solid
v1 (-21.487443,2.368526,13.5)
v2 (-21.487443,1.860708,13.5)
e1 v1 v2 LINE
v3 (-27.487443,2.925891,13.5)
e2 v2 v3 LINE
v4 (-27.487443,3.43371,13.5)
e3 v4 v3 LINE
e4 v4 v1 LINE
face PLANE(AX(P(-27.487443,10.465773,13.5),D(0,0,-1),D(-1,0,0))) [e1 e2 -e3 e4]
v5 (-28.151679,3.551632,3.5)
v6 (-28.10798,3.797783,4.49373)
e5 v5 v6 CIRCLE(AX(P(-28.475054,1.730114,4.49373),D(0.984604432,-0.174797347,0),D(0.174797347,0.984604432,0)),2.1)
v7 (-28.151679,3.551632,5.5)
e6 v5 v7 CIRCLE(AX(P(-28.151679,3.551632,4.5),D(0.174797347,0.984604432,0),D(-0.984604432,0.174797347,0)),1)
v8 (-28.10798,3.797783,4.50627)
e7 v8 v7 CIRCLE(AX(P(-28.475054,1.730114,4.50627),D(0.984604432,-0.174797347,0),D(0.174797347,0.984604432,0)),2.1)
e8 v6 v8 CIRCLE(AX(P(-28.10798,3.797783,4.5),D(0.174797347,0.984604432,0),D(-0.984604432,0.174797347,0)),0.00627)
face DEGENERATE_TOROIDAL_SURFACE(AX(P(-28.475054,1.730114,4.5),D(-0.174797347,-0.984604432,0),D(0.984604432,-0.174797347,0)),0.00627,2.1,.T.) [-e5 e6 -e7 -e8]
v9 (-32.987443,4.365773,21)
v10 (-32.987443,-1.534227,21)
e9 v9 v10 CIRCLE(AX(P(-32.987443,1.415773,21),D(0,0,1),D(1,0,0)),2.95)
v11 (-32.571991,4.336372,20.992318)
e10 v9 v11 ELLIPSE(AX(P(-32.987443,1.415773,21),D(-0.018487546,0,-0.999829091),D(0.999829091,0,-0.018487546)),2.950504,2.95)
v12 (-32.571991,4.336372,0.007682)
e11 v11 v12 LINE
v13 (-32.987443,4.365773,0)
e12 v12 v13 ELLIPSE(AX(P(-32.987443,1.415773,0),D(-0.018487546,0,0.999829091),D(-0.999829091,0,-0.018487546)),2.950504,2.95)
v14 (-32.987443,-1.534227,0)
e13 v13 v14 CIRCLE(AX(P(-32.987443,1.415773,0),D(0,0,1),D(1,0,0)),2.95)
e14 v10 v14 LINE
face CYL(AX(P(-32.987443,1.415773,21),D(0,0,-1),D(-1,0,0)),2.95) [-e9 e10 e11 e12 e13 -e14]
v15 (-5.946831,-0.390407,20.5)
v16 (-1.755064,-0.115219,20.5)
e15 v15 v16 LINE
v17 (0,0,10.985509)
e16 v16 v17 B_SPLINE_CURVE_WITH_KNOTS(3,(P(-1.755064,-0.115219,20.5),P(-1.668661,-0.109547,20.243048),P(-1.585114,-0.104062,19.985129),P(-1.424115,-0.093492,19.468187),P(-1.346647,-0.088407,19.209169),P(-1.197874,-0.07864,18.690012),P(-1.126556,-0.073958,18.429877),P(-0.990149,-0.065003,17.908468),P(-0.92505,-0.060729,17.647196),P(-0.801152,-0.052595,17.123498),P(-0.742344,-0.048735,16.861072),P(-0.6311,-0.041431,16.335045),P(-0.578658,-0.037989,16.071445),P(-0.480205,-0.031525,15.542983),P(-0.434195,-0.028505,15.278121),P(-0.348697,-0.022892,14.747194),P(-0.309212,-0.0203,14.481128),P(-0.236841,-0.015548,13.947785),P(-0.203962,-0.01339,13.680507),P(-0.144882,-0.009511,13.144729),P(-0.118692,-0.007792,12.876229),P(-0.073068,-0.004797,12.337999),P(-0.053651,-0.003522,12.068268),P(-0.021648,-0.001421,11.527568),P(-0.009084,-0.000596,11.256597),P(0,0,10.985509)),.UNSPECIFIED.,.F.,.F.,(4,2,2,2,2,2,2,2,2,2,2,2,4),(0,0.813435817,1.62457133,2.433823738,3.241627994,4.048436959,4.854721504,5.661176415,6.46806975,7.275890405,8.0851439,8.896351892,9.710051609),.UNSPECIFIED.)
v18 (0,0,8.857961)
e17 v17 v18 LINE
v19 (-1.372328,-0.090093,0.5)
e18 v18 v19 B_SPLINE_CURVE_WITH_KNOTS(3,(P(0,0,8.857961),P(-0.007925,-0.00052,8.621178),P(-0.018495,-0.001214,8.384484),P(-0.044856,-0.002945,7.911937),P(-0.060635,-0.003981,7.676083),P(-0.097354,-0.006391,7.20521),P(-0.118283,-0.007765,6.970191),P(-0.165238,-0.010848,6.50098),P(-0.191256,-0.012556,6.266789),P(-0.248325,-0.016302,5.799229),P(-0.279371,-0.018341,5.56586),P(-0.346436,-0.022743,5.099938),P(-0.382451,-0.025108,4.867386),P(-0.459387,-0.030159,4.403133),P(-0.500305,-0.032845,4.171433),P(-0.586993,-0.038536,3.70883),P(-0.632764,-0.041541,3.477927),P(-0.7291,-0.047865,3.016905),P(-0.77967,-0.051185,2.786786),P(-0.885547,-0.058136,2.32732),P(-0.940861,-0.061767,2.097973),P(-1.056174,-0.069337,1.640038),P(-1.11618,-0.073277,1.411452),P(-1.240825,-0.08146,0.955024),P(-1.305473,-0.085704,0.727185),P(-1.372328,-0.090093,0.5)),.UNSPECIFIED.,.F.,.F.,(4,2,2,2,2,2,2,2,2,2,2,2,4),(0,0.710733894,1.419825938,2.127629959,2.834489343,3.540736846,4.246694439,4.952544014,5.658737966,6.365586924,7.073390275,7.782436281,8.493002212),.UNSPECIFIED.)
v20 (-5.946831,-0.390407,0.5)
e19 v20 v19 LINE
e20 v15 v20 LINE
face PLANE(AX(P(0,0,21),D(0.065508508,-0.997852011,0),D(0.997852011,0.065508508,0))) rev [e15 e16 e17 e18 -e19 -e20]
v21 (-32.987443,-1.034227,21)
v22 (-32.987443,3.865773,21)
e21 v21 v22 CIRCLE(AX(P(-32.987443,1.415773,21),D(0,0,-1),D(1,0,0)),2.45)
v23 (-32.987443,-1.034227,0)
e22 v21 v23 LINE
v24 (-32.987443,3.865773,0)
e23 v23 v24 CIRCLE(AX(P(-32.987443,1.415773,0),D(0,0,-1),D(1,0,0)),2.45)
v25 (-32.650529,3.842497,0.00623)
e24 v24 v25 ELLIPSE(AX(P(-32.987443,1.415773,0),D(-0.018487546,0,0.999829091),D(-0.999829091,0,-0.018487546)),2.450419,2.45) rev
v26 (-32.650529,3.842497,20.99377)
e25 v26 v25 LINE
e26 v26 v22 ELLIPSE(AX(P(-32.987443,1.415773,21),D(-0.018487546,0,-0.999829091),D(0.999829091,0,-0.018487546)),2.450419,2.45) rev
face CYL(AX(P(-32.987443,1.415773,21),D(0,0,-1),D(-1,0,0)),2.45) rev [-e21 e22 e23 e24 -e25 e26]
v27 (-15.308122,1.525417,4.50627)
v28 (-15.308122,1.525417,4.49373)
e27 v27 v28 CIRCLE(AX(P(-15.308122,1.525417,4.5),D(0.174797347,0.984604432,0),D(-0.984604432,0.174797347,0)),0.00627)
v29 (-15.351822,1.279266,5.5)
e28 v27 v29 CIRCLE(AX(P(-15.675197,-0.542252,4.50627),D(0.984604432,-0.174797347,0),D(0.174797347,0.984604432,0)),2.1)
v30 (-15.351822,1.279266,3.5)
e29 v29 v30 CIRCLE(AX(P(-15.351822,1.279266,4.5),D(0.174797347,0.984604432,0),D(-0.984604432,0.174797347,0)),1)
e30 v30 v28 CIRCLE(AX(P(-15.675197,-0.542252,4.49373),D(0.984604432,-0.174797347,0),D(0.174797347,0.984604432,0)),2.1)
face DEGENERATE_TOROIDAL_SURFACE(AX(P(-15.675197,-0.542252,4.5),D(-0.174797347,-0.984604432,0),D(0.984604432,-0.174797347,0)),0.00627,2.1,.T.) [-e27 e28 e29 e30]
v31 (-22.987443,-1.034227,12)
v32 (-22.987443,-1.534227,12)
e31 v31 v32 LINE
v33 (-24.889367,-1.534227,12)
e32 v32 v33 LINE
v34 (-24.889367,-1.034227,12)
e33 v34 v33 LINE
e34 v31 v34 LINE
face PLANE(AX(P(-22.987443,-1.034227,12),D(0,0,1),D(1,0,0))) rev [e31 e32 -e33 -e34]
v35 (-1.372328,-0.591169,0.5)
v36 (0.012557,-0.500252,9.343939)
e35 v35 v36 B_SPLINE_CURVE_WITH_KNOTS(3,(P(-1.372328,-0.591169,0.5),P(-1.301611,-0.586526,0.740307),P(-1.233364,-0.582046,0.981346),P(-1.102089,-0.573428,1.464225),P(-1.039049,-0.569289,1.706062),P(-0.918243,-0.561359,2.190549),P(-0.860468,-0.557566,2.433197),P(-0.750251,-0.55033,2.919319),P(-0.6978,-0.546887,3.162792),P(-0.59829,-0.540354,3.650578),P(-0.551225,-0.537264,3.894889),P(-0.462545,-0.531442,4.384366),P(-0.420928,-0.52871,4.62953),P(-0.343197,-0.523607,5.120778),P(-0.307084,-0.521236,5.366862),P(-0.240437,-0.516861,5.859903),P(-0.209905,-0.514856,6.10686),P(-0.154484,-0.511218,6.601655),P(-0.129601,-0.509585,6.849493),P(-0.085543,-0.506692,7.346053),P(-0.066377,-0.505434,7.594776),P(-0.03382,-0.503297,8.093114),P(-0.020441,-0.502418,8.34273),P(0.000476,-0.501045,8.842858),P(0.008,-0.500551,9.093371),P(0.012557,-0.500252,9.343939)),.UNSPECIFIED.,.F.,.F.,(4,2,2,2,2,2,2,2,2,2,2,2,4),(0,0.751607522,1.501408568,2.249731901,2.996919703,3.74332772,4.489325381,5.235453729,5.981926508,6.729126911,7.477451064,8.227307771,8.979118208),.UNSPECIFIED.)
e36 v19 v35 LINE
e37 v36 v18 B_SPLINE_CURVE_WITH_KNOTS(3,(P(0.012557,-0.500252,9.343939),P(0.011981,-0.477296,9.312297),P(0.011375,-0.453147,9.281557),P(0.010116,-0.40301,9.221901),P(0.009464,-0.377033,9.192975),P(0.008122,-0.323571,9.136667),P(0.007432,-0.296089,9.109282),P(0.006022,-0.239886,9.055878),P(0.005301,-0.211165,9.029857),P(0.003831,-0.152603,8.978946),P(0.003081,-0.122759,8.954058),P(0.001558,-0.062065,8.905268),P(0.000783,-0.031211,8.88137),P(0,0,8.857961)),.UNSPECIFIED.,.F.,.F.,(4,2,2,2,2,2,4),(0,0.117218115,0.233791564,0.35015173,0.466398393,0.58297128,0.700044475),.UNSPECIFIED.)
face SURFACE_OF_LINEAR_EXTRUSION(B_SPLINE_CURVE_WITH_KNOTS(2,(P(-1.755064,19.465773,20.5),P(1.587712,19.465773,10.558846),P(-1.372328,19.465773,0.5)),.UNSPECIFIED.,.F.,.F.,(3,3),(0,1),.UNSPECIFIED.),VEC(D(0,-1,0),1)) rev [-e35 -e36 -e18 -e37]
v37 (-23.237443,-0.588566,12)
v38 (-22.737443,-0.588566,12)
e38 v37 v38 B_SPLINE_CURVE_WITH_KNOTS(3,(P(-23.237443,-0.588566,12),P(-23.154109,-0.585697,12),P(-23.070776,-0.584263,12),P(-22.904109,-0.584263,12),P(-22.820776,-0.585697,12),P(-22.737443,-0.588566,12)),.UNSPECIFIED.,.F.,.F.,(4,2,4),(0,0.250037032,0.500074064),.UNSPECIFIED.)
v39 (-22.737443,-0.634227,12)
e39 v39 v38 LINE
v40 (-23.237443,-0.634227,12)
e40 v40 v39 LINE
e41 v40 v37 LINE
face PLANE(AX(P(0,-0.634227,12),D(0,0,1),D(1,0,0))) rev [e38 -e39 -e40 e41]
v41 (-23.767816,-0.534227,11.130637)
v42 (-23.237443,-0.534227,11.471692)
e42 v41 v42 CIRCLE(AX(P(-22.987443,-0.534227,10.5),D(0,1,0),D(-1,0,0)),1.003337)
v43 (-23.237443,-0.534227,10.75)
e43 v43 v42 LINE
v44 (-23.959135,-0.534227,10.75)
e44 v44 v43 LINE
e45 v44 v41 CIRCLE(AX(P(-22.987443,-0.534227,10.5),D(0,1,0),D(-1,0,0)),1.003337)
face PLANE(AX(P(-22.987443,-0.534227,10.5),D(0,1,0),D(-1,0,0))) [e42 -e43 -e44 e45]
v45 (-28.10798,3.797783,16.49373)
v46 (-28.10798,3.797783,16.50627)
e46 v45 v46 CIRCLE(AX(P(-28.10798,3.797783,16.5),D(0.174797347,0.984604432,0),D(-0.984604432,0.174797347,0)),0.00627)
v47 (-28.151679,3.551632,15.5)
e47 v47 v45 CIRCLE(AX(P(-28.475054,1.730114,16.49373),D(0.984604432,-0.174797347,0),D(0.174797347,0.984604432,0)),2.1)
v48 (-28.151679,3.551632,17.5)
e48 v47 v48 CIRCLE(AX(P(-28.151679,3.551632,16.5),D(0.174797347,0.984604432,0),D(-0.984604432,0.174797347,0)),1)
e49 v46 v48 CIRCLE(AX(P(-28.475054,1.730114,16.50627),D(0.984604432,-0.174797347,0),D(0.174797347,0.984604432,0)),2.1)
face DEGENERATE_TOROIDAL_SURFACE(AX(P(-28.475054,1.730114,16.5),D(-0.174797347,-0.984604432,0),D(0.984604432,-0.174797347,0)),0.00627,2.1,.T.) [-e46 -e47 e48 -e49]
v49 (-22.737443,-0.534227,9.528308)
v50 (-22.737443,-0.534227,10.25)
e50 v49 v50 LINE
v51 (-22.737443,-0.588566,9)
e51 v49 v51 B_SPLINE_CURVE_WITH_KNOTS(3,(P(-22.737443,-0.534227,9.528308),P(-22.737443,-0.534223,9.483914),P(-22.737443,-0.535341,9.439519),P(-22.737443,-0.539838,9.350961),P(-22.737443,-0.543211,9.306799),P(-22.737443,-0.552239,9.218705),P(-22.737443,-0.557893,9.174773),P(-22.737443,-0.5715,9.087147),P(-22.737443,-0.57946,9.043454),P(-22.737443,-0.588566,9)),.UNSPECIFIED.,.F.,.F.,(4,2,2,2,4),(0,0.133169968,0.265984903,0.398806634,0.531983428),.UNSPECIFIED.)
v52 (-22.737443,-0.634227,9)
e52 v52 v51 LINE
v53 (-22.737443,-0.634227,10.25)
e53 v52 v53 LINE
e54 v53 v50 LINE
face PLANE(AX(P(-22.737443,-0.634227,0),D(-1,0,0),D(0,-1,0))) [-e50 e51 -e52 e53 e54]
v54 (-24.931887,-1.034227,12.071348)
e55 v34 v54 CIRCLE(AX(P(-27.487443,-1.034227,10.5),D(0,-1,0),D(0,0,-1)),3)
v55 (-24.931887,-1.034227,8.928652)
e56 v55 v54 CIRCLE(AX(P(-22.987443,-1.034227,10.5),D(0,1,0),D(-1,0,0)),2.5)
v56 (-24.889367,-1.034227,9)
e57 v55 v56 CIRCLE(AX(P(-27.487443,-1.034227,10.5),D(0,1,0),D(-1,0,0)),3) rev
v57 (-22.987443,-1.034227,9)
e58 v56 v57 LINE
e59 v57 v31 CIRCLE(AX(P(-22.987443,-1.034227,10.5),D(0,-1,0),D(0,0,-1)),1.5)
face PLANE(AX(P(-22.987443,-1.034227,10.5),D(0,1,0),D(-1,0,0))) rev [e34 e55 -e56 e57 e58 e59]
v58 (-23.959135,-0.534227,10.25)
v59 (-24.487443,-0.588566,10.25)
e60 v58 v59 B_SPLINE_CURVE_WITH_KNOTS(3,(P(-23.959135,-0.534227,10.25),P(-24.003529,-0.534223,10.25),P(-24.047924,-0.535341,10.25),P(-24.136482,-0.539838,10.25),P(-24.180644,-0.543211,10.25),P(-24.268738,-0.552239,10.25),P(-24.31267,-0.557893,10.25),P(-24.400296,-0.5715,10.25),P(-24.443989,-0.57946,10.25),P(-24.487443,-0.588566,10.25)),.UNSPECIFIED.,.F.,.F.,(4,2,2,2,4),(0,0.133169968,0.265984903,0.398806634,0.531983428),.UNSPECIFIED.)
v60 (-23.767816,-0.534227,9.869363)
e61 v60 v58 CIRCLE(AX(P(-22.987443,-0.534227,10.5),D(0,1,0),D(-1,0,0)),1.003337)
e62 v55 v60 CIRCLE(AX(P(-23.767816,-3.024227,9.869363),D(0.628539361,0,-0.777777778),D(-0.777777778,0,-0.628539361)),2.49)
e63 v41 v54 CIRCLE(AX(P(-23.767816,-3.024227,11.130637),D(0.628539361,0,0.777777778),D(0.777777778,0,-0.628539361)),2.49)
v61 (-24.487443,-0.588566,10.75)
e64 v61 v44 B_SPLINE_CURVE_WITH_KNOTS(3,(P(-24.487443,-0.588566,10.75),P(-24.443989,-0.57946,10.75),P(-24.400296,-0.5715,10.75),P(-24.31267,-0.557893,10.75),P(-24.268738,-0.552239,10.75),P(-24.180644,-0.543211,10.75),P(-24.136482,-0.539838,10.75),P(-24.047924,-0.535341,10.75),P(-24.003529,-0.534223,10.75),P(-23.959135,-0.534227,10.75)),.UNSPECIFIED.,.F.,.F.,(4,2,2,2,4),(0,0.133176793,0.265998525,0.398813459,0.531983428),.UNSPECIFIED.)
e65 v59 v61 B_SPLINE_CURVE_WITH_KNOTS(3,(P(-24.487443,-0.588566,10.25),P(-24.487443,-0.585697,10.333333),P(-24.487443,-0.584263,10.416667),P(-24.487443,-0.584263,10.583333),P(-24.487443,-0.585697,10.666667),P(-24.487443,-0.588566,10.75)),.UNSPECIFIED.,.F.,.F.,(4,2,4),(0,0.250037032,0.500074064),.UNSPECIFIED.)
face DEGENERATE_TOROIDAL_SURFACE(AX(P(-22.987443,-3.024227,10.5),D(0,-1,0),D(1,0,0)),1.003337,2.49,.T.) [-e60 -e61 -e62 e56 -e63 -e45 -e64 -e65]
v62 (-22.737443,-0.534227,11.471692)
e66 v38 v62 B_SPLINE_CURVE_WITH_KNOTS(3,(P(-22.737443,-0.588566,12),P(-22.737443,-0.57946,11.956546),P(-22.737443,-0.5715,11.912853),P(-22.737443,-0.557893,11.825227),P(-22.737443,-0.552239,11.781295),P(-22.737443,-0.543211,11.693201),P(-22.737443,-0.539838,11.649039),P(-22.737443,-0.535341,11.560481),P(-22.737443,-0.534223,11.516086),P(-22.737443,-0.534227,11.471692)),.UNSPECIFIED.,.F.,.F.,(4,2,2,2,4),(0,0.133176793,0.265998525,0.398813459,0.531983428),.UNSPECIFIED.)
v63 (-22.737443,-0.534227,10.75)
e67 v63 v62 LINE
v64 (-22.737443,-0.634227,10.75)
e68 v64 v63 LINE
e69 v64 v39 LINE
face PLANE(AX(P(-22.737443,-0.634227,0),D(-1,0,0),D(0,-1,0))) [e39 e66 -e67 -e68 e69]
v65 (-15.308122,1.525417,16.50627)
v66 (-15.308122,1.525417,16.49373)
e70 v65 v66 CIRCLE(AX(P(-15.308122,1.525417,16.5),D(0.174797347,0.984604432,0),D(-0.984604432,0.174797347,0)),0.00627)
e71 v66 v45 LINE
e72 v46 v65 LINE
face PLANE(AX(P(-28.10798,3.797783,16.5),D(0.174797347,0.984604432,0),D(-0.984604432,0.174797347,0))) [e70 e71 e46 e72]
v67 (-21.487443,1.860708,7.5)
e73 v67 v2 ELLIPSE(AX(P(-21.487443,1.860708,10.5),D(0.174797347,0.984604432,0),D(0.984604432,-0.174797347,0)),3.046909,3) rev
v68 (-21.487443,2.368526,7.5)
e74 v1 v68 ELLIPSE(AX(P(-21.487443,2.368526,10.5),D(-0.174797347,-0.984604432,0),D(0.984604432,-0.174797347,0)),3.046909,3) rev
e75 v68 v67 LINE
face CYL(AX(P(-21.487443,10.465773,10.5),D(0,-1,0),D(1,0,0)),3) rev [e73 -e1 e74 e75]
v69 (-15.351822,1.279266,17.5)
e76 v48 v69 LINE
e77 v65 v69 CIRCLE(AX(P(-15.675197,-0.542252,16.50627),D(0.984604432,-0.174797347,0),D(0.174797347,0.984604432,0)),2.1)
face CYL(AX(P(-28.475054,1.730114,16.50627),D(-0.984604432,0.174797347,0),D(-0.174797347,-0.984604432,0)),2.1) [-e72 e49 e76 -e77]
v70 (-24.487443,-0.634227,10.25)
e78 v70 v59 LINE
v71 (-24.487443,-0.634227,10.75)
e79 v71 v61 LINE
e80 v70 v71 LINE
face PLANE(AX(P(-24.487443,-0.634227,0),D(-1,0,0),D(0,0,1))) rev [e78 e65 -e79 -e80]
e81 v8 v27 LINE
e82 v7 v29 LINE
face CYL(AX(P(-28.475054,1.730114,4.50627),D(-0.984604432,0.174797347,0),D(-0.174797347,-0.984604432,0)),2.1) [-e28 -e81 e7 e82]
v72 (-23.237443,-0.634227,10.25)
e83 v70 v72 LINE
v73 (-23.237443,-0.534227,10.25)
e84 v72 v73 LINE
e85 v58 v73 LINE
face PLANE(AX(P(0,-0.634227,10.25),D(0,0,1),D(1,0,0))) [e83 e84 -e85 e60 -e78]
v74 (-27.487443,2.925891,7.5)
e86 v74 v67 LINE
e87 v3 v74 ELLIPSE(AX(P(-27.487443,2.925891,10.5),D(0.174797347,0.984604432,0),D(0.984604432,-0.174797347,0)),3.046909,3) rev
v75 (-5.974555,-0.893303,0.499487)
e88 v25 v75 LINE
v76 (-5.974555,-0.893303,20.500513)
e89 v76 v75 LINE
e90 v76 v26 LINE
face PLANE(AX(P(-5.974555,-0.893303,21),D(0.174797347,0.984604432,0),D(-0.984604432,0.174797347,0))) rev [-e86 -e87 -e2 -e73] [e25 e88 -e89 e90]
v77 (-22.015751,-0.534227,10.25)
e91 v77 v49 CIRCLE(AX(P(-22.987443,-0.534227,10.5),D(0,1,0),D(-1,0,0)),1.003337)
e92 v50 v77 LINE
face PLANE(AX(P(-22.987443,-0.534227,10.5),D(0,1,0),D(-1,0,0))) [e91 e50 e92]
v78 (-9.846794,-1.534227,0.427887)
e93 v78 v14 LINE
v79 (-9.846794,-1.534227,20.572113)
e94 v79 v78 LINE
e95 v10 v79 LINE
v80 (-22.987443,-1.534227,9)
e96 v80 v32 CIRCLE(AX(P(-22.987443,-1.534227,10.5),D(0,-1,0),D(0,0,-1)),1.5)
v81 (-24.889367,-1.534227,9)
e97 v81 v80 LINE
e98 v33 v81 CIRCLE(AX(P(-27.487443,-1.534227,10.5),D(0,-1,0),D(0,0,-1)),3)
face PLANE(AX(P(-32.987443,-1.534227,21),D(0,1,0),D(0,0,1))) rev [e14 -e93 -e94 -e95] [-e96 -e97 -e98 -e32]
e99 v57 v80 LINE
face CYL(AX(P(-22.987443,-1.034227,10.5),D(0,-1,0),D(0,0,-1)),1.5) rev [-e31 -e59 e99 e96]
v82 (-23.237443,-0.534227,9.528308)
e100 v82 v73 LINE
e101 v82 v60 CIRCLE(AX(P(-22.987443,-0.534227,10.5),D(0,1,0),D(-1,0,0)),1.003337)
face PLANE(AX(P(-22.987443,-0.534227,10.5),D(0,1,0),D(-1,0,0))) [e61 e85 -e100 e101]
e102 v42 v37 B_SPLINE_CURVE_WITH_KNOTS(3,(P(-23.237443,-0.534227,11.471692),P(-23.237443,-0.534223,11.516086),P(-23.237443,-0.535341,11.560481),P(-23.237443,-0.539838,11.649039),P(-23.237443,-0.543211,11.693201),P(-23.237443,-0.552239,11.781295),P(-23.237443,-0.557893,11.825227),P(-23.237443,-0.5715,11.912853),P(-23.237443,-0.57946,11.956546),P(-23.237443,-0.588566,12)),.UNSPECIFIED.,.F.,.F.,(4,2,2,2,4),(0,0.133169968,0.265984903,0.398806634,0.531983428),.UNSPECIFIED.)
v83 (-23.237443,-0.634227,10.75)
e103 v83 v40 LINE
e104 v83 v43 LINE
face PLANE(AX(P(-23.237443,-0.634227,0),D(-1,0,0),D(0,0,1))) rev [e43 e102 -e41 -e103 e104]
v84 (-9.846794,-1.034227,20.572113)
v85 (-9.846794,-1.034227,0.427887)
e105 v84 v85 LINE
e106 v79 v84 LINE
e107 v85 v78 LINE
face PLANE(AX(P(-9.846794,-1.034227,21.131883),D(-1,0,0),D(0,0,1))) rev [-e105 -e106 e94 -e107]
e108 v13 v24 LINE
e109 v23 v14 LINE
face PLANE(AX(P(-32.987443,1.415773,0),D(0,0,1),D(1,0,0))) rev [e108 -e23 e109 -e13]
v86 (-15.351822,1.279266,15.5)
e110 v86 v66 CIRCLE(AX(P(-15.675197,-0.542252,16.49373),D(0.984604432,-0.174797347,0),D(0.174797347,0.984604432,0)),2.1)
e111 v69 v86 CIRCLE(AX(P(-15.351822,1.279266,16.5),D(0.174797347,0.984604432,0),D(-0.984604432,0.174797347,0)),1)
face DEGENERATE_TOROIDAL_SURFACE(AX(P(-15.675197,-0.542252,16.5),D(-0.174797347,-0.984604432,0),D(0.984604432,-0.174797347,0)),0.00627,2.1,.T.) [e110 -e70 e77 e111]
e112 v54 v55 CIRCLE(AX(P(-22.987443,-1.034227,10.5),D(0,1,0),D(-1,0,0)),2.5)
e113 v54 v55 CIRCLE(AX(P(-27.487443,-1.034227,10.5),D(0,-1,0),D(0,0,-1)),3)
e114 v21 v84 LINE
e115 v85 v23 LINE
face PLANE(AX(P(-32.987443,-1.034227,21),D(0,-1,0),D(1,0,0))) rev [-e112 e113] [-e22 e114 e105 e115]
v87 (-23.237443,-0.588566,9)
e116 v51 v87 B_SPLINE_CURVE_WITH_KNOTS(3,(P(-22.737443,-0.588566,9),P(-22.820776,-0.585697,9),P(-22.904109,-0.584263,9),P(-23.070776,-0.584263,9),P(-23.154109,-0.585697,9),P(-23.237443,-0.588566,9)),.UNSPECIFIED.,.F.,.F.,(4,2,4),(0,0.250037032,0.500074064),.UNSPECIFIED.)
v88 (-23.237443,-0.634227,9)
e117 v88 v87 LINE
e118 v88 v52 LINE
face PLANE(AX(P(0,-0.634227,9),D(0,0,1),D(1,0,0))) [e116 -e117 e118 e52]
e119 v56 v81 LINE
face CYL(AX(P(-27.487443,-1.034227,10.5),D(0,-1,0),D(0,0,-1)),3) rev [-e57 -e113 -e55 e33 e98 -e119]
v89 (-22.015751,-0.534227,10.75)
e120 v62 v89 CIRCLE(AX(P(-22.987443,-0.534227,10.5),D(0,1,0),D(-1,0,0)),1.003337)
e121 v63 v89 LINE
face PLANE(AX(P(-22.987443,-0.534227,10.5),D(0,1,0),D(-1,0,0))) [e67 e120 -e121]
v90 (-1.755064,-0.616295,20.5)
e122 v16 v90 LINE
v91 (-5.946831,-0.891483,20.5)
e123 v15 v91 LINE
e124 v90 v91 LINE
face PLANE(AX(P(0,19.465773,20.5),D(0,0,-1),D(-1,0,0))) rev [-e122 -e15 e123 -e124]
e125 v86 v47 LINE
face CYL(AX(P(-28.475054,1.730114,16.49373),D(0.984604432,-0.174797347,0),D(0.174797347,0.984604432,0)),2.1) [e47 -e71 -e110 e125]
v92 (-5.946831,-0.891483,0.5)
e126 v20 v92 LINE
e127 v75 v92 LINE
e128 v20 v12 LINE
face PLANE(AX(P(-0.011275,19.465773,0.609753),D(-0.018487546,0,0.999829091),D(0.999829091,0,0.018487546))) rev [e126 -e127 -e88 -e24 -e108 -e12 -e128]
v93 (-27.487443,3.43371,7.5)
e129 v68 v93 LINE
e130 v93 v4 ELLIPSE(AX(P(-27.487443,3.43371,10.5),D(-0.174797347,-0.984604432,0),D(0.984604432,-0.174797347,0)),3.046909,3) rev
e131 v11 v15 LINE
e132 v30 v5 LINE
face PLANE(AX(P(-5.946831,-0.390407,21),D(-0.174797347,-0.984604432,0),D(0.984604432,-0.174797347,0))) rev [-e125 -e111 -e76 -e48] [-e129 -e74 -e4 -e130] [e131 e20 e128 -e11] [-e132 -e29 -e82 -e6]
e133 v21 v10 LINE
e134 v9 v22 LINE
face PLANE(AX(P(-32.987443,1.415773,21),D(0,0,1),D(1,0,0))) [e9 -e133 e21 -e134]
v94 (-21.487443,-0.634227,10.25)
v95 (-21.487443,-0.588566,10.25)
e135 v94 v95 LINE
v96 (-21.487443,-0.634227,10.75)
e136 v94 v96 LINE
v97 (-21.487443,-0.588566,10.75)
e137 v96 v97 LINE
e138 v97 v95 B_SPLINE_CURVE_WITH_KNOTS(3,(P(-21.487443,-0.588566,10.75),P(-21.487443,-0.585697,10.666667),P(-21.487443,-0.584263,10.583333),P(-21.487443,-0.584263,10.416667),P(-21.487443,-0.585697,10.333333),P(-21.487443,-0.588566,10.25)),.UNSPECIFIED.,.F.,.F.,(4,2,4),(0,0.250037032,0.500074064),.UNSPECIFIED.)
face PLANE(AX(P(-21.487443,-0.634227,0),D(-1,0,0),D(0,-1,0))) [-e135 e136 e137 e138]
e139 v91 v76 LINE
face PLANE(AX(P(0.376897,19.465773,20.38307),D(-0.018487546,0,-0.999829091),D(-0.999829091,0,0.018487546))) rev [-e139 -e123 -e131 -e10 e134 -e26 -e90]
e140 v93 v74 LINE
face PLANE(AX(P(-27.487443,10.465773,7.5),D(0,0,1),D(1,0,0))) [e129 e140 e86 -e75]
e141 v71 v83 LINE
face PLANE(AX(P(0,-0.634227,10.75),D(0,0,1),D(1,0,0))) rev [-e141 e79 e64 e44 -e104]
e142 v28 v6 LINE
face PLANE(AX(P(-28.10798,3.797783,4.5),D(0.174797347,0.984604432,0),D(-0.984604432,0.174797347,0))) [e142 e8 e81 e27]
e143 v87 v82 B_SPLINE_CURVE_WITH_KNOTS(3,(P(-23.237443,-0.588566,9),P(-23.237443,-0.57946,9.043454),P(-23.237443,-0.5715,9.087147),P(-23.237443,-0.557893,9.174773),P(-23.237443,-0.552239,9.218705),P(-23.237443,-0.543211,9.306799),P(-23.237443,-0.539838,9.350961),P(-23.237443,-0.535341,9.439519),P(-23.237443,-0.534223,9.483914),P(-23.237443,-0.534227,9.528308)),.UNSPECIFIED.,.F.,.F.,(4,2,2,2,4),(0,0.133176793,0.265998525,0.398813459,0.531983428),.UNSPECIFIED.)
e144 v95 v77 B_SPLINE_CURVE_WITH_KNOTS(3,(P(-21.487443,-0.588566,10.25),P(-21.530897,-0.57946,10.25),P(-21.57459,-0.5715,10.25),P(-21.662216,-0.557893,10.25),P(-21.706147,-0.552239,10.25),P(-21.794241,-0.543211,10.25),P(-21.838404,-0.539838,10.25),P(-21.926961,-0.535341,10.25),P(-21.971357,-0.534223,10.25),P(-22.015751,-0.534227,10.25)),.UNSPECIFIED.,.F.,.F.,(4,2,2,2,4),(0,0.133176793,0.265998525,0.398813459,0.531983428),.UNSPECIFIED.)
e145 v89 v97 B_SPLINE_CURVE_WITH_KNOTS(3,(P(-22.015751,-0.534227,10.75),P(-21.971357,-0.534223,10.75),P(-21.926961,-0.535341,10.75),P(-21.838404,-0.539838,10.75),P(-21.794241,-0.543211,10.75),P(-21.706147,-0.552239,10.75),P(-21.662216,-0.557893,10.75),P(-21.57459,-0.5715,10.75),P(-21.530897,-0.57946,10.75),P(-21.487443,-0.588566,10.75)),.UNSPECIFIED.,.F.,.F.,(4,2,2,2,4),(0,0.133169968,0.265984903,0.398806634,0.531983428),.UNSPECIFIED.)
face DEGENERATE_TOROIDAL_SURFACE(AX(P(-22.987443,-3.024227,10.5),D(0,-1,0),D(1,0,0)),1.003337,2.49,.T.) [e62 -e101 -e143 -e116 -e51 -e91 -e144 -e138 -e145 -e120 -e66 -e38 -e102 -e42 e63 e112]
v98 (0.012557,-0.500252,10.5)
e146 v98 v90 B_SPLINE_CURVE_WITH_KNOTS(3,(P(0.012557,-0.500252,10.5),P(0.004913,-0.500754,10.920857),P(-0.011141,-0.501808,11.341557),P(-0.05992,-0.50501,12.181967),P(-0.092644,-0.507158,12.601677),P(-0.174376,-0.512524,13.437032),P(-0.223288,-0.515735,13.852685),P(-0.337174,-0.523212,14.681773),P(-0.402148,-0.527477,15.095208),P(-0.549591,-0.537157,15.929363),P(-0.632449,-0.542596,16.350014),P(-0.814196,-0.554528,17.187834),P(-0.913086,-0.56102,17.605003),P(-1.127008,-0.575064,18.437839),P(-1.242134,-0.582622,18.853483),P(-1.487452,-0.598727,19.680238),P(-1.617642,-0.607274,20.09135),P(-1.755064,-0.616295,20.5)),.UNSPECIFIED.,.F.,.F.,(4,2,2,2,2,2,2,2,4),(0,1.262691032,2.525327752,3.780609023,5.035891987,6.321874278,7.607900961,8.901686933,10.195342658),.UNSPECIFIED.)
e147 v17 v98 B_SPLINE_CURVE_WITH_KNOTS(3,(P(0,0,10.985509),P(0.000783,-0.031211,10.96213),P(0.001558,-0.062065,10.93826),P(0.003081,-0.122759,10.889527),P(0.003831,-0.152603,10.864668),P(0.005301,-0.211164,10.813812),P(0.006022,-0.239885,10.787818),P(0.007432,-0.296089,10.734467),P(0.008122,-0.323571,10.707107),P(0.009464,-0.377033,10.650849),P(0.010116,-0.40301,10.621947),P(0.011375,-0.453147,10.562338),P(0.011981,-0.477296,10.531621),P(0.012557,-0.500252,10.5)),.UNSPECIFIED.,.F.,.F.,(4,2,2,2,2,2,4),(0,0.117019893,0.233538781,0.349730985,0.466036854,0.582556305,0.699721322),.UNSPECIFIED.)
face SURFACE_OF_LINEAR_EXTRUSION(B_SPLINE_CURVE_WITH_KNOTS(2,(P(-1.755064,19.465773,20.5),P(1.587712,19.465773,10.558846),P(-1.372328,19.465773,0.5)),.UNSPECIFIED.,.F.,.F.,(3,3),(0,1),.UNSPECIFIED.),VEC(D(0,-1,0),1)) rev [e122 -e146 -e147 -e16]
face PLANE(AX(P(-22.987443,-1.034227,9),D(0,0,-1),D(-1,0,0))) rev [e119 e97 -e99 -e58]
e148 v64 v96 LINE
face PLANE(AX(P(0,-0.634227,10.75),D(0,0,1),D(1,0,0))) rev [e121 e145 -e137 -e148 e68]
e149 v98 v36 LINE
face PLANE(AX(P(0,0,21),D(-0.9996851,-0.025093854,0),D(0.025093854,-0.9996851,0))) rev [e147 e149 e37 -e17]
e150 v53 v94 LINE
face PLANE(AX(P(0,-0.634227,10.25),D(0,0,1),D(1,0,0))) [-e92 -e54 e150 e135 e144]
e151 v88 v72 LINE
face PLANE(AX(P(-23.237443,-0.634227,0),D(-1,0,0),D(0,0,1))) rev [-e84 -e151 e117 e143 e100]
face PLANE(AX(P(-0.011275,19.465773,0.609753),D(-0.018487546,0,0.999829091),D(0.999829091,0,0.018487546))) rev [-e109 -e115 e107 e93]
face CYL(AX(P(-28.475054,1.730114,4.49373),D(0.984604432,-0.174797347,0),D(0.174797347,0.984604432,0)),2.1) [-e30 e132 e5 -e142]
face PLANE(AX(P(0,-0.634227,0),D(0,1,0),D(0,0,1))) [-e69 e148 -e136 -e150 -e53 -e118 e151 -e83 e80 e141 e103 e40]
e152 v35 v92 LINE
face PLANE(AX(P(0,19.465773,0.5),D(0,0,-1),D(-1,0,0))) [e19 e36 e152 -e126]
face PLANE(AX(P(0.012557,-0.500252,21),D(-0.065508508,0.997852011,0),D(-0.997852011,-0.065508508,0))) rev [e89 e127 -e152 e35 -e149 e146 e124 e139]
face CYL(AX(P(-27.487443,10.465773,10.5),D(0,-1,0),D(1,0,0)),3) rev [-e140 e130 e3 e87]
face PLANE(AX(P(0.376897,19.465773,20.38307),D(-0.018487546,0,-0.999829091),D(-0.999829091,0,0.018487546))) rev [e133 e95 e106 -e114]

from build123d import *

# Parameters (mm, degrees)
BOSS_EXTRUDE1_DEPTH = 21
CUT_EXTRUDE1_START  = -5.9
CUT_EXTRUDE1_DEPTH  = 5.9
SKETCH3_W           = 10
SKETCH3_H           = 23.477945608
CUT_EXTRUDE2_DEPTH  = 0.5
CUT_EXTRUDE3_DEPTH  = 0.5
CUT_EXTRUDE4_DEPTH  = 11.5
BOSS_EXTRUDE2_DEPTH = 0.25
FILLET1_R           = 2.1
SKETCH7_R           = 2.5
BOSS_EXTRUDE3_DEPTH = 0.5
SKETCH8_W           = 0.5
SKETCH8_H           = 1.25
SKETCH8_H_2         = 0.5
SKETCH8_W_2         = 1.25
CUT_EXTRUDE5_DEPTH  = 0.1
FILLET2_R           = 2.49


# Read off the part's stored shape, not the designer's step: Cut-Extrude1
with BuildPart() as part:
    # Sketch1 → Boss-Extrude1 (new body)
    with BuildSketch(Plane.XY):
        with BuildLine():
            Line((0.012557203, -0.500251932), (-5.974554862, -0.89330298))
            Line((-5.974554862, -0.89330298), (-32.650528742, 3.842496807))
            ThreePointArc((-32.650528742, 3.842496807), (-35.431616847, 1.584631463), (-32.987442797, -1.0342271))
            Line((-32.987442797, -1.0342271), (0.012557203, -1.0342271))
            Line((0.012557203, -1.0342271), (0.012557203, -1.5342271))
            Line((0.012557203, -1.5342271), (-32.987442797, -1.5342271))
            ThreePointArc((-32.987442797, -1.5342271), (-35.930083434, 1.624018145), (-32.571991326, 4.336372166))
            Line((-32.571991326, 4.336372166), (-5.946831197, -0.390406628))
            Line((-5.946831197, -0.390406628), (0, 0))
            Line((0, 0), (0.012557203, -0.500251932))
        make_face()
    extrude(amount=BOSS_EXTRUDE1_DEPTH)

    # Cut-Extrude1 outline → Cut-Extrude1 (cut)
    with BuildSketch(Plane.XZ.offset(1.5342271).offset(CUT_EXTRUDE1_START)):
        with BuildLine():
            Line((0.012557203, 0), (0.012557203, 9.343939236))
            add(Edge.make_bspline(
                [(0.012557203, 9.343939236), (-0.067700916, 4.933400966), (-1.372327976, 0.5)],
                knots=[0.559253537, 0.559253537, 0.559253537, 1, 1, 1], degree=2))
            Line((-1.372327976, 0.5), (-5.946831197, 0.5))
            Line((-5.946831197, 0.5), (-32.987442797, 0))
            Line((-32.987442797, 0), (0.012557203, 0))
        make_face()
        with BuildLine():
            add(Edge.make_bspline(
                [(-1.755064488, 20.5), (-0.078758631, 15.514798295), (0.012557203, 10.5)],
                knots=[0, 0, 0, 0.501471147, 0.501471147, 0.501471147], degree=2))
            Line((0.012557203, 10.5), (0.012557203, 21))
            Line((0.012557203, 21), (-32.987442797, 21))
            Line((-32.987442797, 21), (-5.946831197, 20.5))
            Line((-5.946831197, 20.5), (-1.755064488, 20.5))
        make_face()
    extrude(amount=CUT_EXTRUDE1_DEPTH, mode=Mode.SUBTRACT)

    # Sketch3 → Cut-Extrude2 (cut)
    with BuildSketch(Plane.XZ.offset(1.5342271)):
        with Locations((-4.846794028, 9.392909882)):
            Rectangle(SKETCH3_W, SKETCH3_H)
    extrude(amount=-CUT_EXTRUDE2_DEPTH, mode=Mode.SUBTRACT)

    # Sketch4 → Cut-Extrude3 (cut)
    with BuildSketch(Plane.XZ.offset(1.5342271)):
        with BuildLine():
            Line((-22.987442797, 12), (-24.889366586, 12))
            ThreePointArc((-24.889366586, 12), (-30.487442797, 10.5), (-24.889366586, 9))
            Line((-24.889366586, 9), (-22.987442797, 9))
            ThreePointArc((-22.987442797, 9), (-21.487442797, 10.5), (-22.987442797, 12))
        make_face()
    extrude(amount=-CUT_EXTRUDE3_DEPTH, mode=Mode.SUBTRACT)

    # Sketch5 → Cut-Extrude4 (cut)
    with BuildSketch(Plane(origin=(0, -1.0342271, 0), x_dir=(1, 0, 0), z_dir=(0, 1, 0))):
        with BuildLine():
            Line((-27.487442797, -13.5), (-21.487442797, -13.5))
            ThreePointArc((-21.487442797, -13.5), (-18.487442797, -10.5), (-21.487442797, -7.5))
            Line((-21.487442797, -7.5), (-27.487442797, -7.5))
            ThreePointArc((-27.487442797, -7.5), (-30.487442797, -10.5), (-27.487442797, -13.5))
        make_face()
    extrude(amount=CUT_EXTRUDE4_DEPTH, mode=Mode.SUBTRACT)

    # Sketch6 → Boss-Extrude2 (add)
    with BuildSketch(Plane(origin=(-0.248891567, -1.401964872, 0), x_dir=(0.9846044320073983, -0.1747973468659884, 0), z_dir=(0.17479734686598838, 0.9846044320073982, 0))):
        with BuildLine():
            Line((-28.339083857, -3.5), (-15.339083857, -3.5))
            ThreePointArc((-15.339083857, -3.5), (-14.339083857, -4.5), (-15.339083857, -5.5))
            Line((-15.339083857, -5.5), (-28.339083857, -5.5))
            ThreePointArc((-28.339083857, -5.5), (-29.339083857, -4.5), (-28.339083857, -3.5))
        make_face()
        with BuildLine():
            Line((-28.339083857, -15.5), (-15.339083857, -15.5))
            ThreePointArc((-15.339083857, -15.5), (-14.339083857, -16.5), (-15.339083857, -17.5))
            Line((-15.339083857, -17.5), (-28.339083857, -17.5))
            ThreePointArc((-28.339083857, -17.5), (-29.339083857, -16.5), (-28.339083857, -15.5))
        make_face()
    extrude(amount=BOSS_EXTRUDE2_DEPTH)

    # Fillet1
    # the kernel refuses this fillet: 2.1 mm, written as the material it takes off along each edge
    with BuildSketch(Plane(origin=(-28.107979795, 3.797782907, 3.5), x_dir=(-0.1747973468659884, -0.9846044320073982, 0), z_dir=(0.9846044320073983, -0.1747973468659884, 0)), Plane(origin=(-15.308122178, 1.525417398, 5.5), x_dir=(-0.17479734686598844, -0.9846044320073983, 0), z_dir=(-0.9846044320073983, 0.1747973468659884, 0)), Plane(origin=(-28.107979795, 3.797782907, 15.5), x_dir=(-0.1747973468659884, -0.9846044320073983, 0), z_dir=(0.9846044320073983, -0.1747973468659884, 0)), Plane(origin=(-15.308122178, 1.525417398, 17.5), x_dir=(-0.17479734686598838, -0.9846044320073983, 0), z_dir=(-0.9846044320073983, 0.1747973468659884, 0))) as fillet1_piece_1:
        with BuildLine():
            CenterArc((2.1, -0.993730346), FILLET1_R, 151.757462816, 28.242537184)
            Line((0, -0.993730346), (-0.042, -0.993730346))
            Line((-0.042, -0.993730346), (-0.042, 0))
            Line((-0.042, 0), (0, 0.042))
            ThreePointArc((0, 0.042), (0.125, 0.042), (0.213, 0.019874607))
            Line((0.213, 0.019874607), (0.25, 0))
        make_face()
    extrude(amount=13, mode=Mode.SUBTRACT)
    with BuildSketch(Plane(origin=(-15.308122178, 1.525417398, 16.5), x_dir=(0, 0, -1), z_dir=(-0.9846044320073983, 0.1747973468659884, 0))) as fillet1_piece_2:
        with BuildLine():
            CenterArc((0.006269654, 2.1), FILLET1_R, 270, 28.242537184)
            Line((0.006269654, 0), (0.006269654, -0.042))
            Line((0.006269654, -0.042), (1, -0.042))
            Line((1, -0.042), (1.042, 0))
            ThreePointArc((1.042, 0), (1.042, 0.125), (1.019874607, 0.213))
            Line((1.019874607, 0.213), (1, 0.25))
        make_face()
    revolve(axis=Axis((-15.308122178, 1.525417398, 16.5), (-0.1747973468659884, -0.9846044320073983, 0)), revolution_arc=180, mode=Mode.SUBTRACT)
    with BuildSketch(Plane(origin=(-28.107979795, 3.797782907, 16.5), x_dir=(0, 0, 1), z_dir=(0.9846044320073983, -0.1747973468659884, 0))) as fillet1_piece_3:
        with BuildLine():
            CenterArc((0.006269654, 2.1), FILLET1_R, 270, 28.242537184)
            Line((0.006269654, 0), (0.006269654, -0.042))
            Line((0.006269654, -0.042), (1, -0.042))
            Line((1, -0.042), (1.042, 0))
            ThreePointArc((1.042, 0), (1.042, 0.125), (1.019874607, 0.213))
            Line((1.019874607, 0.213), (1, 0.25))
        make_face()
    revolve(axis=Axis((-28.107979795, 3.797782907, 16.5), (-0.1747973468659884, -0.9846044320073983, 0)), revolution_arc=180, mode=Mode.SUBTRACT)
    with BuildSketch(Plane(origin=(-15.308122178, 1.525417398, 4.5), x_dir=(0, 0, -1), z_dir=(-0.9846044320073983, 0.1747973468659884, 0))) as fillet1_piece_4:
        with BuildLine():
            CenterArc((0.006269654, 2.1), FILLET1_R, 270, 28.242537184)
            Line((0.006269654, 0), (0.006269654, -0.042))
            Line((0.006269654, -0.042), (1, -0.042))
            Line((1, -0.042), (1.042, 0))
            ThreePointArc((1.042, 0), (1.042, 0.125), (1.019874607, 0.213))
            Line((1.019874607, 0.213), (1, 0.25))
        make_face()
    revolve(axis=Axis((-15.308122178, 1.525417398, 4.5), (-0.1747973468659884, -0.9846044320073983, 0)), revolution_arc=180, mode=Mode.SUBTRACT)
    with BuildSketch(Plane(origin=(-28.107979795, 3.797782907, 4.5), x_dir=(0, 0, 1), z_dir=(0.9846044320073983, -0.1747973468659884, 0))) as fillet1_piece_5:
        with BuildLine():
            CenterArc((0.006269654, 2.1), FILLET1_R, 270, 28.242537184)
            Line((0.006269654, 0), (0.006269654, -0.042))
            Line((0.006269654, -0.042), (1, -0.042))
            Line((1, -0.042), (1.042, 0))
            ThreePointArc((1.042, 0), (1.042, 0.125), (1.019874607, 0.213))
            Line((1.019874607, 0.213), (1, 0.25))
        make_face()
    revolve(axis=Axis((-28.107979795, 3.797782907, 4.5), (-0.1747973468659884, -0.9846044320073983, 0)), revolution_arc=180, mode=Mode.SUBTRACT)

    # Sketch7 → Boss-Extrude3 (add)
    with BuildSketch(Plane(origin=(0, -1.0342271, 0), x_dir=(1, 0, 0), z_dir=(0, 1, 0))):
        with Locations(Location((-22.987442797, -10.5, 0), (0, 0, 218.942441269))):
            Circle(SKETCH7_R)
    extrude(amount=BOSS_EXTRUDE3_DEPTH)

    # Sketch8 → Cut-Extrude5 (cut)
    with BuildSketch(Plane(origin=(0, -0.5342271, 0), x_dir=(1, 0, 0), z_dir=(0, 1, 0))):
        with Locations((-22.987442797, -11.375)):
            Rectangle(SKETCH8_W, SKETCH8_H)
        with Locations((-22.987442797, -10.5)):
            Rectangle(SKETCH8_W, SKETCH8_H_2)
        with Locations((-22.987442797, -9.625)):
            Rectangle(SKETCH8_W, SKETCH8_H)
        with Locations((-23.862442797, -10.5)):
            Rectangle(SKETCH8_W_2, SKETCH8_H_2)
        with Locations((-22.112442797, -10.5)):
            Rectangle(SKETCH8_W_2, SKETCH8_H_2)
    extrude(amount=-CUT_EXTRUDE5_DEPTH, mode=Mode.SUBTRACT)

    # Fillet2
    # the kernel refuses this fillet: 2.49 mm, written as the material it takes off along each edge
    with BuildSketch(Plane(origin=(-22.987442797, -0.5342271, 10.5), x_dir=(-0.777777777777574, 0, 0.6285393610549612), z_dir=(-0.6285393610549612, 0, -0.777777777777574))) as fillet2_piece_1:
        with BuildLine():
            CenterArc((1.003337045, -2.49), FILLET2_R, 53.053469485, 36.946530515)
            Line((1.003337045, 0), (1.003337045, 0.0498))
            Line((1.003337045, 0.0498), (2.5, 0.0498))
            Line((2.5, 0.0498), (2.5498, 0))
            ThreePointArc((2.5498, 0), (2.5498, -0.25), (2.529933259, -0.4602))
            Line((2.529933259, -0.4602), (2.5, -0.5))
        make_face()
    revolve(axis=Axis((-22.987442797, -0.5342271, 10.5), (0, 1, 0)), mode=Mode.SUBTRACT)


solid = part.part
